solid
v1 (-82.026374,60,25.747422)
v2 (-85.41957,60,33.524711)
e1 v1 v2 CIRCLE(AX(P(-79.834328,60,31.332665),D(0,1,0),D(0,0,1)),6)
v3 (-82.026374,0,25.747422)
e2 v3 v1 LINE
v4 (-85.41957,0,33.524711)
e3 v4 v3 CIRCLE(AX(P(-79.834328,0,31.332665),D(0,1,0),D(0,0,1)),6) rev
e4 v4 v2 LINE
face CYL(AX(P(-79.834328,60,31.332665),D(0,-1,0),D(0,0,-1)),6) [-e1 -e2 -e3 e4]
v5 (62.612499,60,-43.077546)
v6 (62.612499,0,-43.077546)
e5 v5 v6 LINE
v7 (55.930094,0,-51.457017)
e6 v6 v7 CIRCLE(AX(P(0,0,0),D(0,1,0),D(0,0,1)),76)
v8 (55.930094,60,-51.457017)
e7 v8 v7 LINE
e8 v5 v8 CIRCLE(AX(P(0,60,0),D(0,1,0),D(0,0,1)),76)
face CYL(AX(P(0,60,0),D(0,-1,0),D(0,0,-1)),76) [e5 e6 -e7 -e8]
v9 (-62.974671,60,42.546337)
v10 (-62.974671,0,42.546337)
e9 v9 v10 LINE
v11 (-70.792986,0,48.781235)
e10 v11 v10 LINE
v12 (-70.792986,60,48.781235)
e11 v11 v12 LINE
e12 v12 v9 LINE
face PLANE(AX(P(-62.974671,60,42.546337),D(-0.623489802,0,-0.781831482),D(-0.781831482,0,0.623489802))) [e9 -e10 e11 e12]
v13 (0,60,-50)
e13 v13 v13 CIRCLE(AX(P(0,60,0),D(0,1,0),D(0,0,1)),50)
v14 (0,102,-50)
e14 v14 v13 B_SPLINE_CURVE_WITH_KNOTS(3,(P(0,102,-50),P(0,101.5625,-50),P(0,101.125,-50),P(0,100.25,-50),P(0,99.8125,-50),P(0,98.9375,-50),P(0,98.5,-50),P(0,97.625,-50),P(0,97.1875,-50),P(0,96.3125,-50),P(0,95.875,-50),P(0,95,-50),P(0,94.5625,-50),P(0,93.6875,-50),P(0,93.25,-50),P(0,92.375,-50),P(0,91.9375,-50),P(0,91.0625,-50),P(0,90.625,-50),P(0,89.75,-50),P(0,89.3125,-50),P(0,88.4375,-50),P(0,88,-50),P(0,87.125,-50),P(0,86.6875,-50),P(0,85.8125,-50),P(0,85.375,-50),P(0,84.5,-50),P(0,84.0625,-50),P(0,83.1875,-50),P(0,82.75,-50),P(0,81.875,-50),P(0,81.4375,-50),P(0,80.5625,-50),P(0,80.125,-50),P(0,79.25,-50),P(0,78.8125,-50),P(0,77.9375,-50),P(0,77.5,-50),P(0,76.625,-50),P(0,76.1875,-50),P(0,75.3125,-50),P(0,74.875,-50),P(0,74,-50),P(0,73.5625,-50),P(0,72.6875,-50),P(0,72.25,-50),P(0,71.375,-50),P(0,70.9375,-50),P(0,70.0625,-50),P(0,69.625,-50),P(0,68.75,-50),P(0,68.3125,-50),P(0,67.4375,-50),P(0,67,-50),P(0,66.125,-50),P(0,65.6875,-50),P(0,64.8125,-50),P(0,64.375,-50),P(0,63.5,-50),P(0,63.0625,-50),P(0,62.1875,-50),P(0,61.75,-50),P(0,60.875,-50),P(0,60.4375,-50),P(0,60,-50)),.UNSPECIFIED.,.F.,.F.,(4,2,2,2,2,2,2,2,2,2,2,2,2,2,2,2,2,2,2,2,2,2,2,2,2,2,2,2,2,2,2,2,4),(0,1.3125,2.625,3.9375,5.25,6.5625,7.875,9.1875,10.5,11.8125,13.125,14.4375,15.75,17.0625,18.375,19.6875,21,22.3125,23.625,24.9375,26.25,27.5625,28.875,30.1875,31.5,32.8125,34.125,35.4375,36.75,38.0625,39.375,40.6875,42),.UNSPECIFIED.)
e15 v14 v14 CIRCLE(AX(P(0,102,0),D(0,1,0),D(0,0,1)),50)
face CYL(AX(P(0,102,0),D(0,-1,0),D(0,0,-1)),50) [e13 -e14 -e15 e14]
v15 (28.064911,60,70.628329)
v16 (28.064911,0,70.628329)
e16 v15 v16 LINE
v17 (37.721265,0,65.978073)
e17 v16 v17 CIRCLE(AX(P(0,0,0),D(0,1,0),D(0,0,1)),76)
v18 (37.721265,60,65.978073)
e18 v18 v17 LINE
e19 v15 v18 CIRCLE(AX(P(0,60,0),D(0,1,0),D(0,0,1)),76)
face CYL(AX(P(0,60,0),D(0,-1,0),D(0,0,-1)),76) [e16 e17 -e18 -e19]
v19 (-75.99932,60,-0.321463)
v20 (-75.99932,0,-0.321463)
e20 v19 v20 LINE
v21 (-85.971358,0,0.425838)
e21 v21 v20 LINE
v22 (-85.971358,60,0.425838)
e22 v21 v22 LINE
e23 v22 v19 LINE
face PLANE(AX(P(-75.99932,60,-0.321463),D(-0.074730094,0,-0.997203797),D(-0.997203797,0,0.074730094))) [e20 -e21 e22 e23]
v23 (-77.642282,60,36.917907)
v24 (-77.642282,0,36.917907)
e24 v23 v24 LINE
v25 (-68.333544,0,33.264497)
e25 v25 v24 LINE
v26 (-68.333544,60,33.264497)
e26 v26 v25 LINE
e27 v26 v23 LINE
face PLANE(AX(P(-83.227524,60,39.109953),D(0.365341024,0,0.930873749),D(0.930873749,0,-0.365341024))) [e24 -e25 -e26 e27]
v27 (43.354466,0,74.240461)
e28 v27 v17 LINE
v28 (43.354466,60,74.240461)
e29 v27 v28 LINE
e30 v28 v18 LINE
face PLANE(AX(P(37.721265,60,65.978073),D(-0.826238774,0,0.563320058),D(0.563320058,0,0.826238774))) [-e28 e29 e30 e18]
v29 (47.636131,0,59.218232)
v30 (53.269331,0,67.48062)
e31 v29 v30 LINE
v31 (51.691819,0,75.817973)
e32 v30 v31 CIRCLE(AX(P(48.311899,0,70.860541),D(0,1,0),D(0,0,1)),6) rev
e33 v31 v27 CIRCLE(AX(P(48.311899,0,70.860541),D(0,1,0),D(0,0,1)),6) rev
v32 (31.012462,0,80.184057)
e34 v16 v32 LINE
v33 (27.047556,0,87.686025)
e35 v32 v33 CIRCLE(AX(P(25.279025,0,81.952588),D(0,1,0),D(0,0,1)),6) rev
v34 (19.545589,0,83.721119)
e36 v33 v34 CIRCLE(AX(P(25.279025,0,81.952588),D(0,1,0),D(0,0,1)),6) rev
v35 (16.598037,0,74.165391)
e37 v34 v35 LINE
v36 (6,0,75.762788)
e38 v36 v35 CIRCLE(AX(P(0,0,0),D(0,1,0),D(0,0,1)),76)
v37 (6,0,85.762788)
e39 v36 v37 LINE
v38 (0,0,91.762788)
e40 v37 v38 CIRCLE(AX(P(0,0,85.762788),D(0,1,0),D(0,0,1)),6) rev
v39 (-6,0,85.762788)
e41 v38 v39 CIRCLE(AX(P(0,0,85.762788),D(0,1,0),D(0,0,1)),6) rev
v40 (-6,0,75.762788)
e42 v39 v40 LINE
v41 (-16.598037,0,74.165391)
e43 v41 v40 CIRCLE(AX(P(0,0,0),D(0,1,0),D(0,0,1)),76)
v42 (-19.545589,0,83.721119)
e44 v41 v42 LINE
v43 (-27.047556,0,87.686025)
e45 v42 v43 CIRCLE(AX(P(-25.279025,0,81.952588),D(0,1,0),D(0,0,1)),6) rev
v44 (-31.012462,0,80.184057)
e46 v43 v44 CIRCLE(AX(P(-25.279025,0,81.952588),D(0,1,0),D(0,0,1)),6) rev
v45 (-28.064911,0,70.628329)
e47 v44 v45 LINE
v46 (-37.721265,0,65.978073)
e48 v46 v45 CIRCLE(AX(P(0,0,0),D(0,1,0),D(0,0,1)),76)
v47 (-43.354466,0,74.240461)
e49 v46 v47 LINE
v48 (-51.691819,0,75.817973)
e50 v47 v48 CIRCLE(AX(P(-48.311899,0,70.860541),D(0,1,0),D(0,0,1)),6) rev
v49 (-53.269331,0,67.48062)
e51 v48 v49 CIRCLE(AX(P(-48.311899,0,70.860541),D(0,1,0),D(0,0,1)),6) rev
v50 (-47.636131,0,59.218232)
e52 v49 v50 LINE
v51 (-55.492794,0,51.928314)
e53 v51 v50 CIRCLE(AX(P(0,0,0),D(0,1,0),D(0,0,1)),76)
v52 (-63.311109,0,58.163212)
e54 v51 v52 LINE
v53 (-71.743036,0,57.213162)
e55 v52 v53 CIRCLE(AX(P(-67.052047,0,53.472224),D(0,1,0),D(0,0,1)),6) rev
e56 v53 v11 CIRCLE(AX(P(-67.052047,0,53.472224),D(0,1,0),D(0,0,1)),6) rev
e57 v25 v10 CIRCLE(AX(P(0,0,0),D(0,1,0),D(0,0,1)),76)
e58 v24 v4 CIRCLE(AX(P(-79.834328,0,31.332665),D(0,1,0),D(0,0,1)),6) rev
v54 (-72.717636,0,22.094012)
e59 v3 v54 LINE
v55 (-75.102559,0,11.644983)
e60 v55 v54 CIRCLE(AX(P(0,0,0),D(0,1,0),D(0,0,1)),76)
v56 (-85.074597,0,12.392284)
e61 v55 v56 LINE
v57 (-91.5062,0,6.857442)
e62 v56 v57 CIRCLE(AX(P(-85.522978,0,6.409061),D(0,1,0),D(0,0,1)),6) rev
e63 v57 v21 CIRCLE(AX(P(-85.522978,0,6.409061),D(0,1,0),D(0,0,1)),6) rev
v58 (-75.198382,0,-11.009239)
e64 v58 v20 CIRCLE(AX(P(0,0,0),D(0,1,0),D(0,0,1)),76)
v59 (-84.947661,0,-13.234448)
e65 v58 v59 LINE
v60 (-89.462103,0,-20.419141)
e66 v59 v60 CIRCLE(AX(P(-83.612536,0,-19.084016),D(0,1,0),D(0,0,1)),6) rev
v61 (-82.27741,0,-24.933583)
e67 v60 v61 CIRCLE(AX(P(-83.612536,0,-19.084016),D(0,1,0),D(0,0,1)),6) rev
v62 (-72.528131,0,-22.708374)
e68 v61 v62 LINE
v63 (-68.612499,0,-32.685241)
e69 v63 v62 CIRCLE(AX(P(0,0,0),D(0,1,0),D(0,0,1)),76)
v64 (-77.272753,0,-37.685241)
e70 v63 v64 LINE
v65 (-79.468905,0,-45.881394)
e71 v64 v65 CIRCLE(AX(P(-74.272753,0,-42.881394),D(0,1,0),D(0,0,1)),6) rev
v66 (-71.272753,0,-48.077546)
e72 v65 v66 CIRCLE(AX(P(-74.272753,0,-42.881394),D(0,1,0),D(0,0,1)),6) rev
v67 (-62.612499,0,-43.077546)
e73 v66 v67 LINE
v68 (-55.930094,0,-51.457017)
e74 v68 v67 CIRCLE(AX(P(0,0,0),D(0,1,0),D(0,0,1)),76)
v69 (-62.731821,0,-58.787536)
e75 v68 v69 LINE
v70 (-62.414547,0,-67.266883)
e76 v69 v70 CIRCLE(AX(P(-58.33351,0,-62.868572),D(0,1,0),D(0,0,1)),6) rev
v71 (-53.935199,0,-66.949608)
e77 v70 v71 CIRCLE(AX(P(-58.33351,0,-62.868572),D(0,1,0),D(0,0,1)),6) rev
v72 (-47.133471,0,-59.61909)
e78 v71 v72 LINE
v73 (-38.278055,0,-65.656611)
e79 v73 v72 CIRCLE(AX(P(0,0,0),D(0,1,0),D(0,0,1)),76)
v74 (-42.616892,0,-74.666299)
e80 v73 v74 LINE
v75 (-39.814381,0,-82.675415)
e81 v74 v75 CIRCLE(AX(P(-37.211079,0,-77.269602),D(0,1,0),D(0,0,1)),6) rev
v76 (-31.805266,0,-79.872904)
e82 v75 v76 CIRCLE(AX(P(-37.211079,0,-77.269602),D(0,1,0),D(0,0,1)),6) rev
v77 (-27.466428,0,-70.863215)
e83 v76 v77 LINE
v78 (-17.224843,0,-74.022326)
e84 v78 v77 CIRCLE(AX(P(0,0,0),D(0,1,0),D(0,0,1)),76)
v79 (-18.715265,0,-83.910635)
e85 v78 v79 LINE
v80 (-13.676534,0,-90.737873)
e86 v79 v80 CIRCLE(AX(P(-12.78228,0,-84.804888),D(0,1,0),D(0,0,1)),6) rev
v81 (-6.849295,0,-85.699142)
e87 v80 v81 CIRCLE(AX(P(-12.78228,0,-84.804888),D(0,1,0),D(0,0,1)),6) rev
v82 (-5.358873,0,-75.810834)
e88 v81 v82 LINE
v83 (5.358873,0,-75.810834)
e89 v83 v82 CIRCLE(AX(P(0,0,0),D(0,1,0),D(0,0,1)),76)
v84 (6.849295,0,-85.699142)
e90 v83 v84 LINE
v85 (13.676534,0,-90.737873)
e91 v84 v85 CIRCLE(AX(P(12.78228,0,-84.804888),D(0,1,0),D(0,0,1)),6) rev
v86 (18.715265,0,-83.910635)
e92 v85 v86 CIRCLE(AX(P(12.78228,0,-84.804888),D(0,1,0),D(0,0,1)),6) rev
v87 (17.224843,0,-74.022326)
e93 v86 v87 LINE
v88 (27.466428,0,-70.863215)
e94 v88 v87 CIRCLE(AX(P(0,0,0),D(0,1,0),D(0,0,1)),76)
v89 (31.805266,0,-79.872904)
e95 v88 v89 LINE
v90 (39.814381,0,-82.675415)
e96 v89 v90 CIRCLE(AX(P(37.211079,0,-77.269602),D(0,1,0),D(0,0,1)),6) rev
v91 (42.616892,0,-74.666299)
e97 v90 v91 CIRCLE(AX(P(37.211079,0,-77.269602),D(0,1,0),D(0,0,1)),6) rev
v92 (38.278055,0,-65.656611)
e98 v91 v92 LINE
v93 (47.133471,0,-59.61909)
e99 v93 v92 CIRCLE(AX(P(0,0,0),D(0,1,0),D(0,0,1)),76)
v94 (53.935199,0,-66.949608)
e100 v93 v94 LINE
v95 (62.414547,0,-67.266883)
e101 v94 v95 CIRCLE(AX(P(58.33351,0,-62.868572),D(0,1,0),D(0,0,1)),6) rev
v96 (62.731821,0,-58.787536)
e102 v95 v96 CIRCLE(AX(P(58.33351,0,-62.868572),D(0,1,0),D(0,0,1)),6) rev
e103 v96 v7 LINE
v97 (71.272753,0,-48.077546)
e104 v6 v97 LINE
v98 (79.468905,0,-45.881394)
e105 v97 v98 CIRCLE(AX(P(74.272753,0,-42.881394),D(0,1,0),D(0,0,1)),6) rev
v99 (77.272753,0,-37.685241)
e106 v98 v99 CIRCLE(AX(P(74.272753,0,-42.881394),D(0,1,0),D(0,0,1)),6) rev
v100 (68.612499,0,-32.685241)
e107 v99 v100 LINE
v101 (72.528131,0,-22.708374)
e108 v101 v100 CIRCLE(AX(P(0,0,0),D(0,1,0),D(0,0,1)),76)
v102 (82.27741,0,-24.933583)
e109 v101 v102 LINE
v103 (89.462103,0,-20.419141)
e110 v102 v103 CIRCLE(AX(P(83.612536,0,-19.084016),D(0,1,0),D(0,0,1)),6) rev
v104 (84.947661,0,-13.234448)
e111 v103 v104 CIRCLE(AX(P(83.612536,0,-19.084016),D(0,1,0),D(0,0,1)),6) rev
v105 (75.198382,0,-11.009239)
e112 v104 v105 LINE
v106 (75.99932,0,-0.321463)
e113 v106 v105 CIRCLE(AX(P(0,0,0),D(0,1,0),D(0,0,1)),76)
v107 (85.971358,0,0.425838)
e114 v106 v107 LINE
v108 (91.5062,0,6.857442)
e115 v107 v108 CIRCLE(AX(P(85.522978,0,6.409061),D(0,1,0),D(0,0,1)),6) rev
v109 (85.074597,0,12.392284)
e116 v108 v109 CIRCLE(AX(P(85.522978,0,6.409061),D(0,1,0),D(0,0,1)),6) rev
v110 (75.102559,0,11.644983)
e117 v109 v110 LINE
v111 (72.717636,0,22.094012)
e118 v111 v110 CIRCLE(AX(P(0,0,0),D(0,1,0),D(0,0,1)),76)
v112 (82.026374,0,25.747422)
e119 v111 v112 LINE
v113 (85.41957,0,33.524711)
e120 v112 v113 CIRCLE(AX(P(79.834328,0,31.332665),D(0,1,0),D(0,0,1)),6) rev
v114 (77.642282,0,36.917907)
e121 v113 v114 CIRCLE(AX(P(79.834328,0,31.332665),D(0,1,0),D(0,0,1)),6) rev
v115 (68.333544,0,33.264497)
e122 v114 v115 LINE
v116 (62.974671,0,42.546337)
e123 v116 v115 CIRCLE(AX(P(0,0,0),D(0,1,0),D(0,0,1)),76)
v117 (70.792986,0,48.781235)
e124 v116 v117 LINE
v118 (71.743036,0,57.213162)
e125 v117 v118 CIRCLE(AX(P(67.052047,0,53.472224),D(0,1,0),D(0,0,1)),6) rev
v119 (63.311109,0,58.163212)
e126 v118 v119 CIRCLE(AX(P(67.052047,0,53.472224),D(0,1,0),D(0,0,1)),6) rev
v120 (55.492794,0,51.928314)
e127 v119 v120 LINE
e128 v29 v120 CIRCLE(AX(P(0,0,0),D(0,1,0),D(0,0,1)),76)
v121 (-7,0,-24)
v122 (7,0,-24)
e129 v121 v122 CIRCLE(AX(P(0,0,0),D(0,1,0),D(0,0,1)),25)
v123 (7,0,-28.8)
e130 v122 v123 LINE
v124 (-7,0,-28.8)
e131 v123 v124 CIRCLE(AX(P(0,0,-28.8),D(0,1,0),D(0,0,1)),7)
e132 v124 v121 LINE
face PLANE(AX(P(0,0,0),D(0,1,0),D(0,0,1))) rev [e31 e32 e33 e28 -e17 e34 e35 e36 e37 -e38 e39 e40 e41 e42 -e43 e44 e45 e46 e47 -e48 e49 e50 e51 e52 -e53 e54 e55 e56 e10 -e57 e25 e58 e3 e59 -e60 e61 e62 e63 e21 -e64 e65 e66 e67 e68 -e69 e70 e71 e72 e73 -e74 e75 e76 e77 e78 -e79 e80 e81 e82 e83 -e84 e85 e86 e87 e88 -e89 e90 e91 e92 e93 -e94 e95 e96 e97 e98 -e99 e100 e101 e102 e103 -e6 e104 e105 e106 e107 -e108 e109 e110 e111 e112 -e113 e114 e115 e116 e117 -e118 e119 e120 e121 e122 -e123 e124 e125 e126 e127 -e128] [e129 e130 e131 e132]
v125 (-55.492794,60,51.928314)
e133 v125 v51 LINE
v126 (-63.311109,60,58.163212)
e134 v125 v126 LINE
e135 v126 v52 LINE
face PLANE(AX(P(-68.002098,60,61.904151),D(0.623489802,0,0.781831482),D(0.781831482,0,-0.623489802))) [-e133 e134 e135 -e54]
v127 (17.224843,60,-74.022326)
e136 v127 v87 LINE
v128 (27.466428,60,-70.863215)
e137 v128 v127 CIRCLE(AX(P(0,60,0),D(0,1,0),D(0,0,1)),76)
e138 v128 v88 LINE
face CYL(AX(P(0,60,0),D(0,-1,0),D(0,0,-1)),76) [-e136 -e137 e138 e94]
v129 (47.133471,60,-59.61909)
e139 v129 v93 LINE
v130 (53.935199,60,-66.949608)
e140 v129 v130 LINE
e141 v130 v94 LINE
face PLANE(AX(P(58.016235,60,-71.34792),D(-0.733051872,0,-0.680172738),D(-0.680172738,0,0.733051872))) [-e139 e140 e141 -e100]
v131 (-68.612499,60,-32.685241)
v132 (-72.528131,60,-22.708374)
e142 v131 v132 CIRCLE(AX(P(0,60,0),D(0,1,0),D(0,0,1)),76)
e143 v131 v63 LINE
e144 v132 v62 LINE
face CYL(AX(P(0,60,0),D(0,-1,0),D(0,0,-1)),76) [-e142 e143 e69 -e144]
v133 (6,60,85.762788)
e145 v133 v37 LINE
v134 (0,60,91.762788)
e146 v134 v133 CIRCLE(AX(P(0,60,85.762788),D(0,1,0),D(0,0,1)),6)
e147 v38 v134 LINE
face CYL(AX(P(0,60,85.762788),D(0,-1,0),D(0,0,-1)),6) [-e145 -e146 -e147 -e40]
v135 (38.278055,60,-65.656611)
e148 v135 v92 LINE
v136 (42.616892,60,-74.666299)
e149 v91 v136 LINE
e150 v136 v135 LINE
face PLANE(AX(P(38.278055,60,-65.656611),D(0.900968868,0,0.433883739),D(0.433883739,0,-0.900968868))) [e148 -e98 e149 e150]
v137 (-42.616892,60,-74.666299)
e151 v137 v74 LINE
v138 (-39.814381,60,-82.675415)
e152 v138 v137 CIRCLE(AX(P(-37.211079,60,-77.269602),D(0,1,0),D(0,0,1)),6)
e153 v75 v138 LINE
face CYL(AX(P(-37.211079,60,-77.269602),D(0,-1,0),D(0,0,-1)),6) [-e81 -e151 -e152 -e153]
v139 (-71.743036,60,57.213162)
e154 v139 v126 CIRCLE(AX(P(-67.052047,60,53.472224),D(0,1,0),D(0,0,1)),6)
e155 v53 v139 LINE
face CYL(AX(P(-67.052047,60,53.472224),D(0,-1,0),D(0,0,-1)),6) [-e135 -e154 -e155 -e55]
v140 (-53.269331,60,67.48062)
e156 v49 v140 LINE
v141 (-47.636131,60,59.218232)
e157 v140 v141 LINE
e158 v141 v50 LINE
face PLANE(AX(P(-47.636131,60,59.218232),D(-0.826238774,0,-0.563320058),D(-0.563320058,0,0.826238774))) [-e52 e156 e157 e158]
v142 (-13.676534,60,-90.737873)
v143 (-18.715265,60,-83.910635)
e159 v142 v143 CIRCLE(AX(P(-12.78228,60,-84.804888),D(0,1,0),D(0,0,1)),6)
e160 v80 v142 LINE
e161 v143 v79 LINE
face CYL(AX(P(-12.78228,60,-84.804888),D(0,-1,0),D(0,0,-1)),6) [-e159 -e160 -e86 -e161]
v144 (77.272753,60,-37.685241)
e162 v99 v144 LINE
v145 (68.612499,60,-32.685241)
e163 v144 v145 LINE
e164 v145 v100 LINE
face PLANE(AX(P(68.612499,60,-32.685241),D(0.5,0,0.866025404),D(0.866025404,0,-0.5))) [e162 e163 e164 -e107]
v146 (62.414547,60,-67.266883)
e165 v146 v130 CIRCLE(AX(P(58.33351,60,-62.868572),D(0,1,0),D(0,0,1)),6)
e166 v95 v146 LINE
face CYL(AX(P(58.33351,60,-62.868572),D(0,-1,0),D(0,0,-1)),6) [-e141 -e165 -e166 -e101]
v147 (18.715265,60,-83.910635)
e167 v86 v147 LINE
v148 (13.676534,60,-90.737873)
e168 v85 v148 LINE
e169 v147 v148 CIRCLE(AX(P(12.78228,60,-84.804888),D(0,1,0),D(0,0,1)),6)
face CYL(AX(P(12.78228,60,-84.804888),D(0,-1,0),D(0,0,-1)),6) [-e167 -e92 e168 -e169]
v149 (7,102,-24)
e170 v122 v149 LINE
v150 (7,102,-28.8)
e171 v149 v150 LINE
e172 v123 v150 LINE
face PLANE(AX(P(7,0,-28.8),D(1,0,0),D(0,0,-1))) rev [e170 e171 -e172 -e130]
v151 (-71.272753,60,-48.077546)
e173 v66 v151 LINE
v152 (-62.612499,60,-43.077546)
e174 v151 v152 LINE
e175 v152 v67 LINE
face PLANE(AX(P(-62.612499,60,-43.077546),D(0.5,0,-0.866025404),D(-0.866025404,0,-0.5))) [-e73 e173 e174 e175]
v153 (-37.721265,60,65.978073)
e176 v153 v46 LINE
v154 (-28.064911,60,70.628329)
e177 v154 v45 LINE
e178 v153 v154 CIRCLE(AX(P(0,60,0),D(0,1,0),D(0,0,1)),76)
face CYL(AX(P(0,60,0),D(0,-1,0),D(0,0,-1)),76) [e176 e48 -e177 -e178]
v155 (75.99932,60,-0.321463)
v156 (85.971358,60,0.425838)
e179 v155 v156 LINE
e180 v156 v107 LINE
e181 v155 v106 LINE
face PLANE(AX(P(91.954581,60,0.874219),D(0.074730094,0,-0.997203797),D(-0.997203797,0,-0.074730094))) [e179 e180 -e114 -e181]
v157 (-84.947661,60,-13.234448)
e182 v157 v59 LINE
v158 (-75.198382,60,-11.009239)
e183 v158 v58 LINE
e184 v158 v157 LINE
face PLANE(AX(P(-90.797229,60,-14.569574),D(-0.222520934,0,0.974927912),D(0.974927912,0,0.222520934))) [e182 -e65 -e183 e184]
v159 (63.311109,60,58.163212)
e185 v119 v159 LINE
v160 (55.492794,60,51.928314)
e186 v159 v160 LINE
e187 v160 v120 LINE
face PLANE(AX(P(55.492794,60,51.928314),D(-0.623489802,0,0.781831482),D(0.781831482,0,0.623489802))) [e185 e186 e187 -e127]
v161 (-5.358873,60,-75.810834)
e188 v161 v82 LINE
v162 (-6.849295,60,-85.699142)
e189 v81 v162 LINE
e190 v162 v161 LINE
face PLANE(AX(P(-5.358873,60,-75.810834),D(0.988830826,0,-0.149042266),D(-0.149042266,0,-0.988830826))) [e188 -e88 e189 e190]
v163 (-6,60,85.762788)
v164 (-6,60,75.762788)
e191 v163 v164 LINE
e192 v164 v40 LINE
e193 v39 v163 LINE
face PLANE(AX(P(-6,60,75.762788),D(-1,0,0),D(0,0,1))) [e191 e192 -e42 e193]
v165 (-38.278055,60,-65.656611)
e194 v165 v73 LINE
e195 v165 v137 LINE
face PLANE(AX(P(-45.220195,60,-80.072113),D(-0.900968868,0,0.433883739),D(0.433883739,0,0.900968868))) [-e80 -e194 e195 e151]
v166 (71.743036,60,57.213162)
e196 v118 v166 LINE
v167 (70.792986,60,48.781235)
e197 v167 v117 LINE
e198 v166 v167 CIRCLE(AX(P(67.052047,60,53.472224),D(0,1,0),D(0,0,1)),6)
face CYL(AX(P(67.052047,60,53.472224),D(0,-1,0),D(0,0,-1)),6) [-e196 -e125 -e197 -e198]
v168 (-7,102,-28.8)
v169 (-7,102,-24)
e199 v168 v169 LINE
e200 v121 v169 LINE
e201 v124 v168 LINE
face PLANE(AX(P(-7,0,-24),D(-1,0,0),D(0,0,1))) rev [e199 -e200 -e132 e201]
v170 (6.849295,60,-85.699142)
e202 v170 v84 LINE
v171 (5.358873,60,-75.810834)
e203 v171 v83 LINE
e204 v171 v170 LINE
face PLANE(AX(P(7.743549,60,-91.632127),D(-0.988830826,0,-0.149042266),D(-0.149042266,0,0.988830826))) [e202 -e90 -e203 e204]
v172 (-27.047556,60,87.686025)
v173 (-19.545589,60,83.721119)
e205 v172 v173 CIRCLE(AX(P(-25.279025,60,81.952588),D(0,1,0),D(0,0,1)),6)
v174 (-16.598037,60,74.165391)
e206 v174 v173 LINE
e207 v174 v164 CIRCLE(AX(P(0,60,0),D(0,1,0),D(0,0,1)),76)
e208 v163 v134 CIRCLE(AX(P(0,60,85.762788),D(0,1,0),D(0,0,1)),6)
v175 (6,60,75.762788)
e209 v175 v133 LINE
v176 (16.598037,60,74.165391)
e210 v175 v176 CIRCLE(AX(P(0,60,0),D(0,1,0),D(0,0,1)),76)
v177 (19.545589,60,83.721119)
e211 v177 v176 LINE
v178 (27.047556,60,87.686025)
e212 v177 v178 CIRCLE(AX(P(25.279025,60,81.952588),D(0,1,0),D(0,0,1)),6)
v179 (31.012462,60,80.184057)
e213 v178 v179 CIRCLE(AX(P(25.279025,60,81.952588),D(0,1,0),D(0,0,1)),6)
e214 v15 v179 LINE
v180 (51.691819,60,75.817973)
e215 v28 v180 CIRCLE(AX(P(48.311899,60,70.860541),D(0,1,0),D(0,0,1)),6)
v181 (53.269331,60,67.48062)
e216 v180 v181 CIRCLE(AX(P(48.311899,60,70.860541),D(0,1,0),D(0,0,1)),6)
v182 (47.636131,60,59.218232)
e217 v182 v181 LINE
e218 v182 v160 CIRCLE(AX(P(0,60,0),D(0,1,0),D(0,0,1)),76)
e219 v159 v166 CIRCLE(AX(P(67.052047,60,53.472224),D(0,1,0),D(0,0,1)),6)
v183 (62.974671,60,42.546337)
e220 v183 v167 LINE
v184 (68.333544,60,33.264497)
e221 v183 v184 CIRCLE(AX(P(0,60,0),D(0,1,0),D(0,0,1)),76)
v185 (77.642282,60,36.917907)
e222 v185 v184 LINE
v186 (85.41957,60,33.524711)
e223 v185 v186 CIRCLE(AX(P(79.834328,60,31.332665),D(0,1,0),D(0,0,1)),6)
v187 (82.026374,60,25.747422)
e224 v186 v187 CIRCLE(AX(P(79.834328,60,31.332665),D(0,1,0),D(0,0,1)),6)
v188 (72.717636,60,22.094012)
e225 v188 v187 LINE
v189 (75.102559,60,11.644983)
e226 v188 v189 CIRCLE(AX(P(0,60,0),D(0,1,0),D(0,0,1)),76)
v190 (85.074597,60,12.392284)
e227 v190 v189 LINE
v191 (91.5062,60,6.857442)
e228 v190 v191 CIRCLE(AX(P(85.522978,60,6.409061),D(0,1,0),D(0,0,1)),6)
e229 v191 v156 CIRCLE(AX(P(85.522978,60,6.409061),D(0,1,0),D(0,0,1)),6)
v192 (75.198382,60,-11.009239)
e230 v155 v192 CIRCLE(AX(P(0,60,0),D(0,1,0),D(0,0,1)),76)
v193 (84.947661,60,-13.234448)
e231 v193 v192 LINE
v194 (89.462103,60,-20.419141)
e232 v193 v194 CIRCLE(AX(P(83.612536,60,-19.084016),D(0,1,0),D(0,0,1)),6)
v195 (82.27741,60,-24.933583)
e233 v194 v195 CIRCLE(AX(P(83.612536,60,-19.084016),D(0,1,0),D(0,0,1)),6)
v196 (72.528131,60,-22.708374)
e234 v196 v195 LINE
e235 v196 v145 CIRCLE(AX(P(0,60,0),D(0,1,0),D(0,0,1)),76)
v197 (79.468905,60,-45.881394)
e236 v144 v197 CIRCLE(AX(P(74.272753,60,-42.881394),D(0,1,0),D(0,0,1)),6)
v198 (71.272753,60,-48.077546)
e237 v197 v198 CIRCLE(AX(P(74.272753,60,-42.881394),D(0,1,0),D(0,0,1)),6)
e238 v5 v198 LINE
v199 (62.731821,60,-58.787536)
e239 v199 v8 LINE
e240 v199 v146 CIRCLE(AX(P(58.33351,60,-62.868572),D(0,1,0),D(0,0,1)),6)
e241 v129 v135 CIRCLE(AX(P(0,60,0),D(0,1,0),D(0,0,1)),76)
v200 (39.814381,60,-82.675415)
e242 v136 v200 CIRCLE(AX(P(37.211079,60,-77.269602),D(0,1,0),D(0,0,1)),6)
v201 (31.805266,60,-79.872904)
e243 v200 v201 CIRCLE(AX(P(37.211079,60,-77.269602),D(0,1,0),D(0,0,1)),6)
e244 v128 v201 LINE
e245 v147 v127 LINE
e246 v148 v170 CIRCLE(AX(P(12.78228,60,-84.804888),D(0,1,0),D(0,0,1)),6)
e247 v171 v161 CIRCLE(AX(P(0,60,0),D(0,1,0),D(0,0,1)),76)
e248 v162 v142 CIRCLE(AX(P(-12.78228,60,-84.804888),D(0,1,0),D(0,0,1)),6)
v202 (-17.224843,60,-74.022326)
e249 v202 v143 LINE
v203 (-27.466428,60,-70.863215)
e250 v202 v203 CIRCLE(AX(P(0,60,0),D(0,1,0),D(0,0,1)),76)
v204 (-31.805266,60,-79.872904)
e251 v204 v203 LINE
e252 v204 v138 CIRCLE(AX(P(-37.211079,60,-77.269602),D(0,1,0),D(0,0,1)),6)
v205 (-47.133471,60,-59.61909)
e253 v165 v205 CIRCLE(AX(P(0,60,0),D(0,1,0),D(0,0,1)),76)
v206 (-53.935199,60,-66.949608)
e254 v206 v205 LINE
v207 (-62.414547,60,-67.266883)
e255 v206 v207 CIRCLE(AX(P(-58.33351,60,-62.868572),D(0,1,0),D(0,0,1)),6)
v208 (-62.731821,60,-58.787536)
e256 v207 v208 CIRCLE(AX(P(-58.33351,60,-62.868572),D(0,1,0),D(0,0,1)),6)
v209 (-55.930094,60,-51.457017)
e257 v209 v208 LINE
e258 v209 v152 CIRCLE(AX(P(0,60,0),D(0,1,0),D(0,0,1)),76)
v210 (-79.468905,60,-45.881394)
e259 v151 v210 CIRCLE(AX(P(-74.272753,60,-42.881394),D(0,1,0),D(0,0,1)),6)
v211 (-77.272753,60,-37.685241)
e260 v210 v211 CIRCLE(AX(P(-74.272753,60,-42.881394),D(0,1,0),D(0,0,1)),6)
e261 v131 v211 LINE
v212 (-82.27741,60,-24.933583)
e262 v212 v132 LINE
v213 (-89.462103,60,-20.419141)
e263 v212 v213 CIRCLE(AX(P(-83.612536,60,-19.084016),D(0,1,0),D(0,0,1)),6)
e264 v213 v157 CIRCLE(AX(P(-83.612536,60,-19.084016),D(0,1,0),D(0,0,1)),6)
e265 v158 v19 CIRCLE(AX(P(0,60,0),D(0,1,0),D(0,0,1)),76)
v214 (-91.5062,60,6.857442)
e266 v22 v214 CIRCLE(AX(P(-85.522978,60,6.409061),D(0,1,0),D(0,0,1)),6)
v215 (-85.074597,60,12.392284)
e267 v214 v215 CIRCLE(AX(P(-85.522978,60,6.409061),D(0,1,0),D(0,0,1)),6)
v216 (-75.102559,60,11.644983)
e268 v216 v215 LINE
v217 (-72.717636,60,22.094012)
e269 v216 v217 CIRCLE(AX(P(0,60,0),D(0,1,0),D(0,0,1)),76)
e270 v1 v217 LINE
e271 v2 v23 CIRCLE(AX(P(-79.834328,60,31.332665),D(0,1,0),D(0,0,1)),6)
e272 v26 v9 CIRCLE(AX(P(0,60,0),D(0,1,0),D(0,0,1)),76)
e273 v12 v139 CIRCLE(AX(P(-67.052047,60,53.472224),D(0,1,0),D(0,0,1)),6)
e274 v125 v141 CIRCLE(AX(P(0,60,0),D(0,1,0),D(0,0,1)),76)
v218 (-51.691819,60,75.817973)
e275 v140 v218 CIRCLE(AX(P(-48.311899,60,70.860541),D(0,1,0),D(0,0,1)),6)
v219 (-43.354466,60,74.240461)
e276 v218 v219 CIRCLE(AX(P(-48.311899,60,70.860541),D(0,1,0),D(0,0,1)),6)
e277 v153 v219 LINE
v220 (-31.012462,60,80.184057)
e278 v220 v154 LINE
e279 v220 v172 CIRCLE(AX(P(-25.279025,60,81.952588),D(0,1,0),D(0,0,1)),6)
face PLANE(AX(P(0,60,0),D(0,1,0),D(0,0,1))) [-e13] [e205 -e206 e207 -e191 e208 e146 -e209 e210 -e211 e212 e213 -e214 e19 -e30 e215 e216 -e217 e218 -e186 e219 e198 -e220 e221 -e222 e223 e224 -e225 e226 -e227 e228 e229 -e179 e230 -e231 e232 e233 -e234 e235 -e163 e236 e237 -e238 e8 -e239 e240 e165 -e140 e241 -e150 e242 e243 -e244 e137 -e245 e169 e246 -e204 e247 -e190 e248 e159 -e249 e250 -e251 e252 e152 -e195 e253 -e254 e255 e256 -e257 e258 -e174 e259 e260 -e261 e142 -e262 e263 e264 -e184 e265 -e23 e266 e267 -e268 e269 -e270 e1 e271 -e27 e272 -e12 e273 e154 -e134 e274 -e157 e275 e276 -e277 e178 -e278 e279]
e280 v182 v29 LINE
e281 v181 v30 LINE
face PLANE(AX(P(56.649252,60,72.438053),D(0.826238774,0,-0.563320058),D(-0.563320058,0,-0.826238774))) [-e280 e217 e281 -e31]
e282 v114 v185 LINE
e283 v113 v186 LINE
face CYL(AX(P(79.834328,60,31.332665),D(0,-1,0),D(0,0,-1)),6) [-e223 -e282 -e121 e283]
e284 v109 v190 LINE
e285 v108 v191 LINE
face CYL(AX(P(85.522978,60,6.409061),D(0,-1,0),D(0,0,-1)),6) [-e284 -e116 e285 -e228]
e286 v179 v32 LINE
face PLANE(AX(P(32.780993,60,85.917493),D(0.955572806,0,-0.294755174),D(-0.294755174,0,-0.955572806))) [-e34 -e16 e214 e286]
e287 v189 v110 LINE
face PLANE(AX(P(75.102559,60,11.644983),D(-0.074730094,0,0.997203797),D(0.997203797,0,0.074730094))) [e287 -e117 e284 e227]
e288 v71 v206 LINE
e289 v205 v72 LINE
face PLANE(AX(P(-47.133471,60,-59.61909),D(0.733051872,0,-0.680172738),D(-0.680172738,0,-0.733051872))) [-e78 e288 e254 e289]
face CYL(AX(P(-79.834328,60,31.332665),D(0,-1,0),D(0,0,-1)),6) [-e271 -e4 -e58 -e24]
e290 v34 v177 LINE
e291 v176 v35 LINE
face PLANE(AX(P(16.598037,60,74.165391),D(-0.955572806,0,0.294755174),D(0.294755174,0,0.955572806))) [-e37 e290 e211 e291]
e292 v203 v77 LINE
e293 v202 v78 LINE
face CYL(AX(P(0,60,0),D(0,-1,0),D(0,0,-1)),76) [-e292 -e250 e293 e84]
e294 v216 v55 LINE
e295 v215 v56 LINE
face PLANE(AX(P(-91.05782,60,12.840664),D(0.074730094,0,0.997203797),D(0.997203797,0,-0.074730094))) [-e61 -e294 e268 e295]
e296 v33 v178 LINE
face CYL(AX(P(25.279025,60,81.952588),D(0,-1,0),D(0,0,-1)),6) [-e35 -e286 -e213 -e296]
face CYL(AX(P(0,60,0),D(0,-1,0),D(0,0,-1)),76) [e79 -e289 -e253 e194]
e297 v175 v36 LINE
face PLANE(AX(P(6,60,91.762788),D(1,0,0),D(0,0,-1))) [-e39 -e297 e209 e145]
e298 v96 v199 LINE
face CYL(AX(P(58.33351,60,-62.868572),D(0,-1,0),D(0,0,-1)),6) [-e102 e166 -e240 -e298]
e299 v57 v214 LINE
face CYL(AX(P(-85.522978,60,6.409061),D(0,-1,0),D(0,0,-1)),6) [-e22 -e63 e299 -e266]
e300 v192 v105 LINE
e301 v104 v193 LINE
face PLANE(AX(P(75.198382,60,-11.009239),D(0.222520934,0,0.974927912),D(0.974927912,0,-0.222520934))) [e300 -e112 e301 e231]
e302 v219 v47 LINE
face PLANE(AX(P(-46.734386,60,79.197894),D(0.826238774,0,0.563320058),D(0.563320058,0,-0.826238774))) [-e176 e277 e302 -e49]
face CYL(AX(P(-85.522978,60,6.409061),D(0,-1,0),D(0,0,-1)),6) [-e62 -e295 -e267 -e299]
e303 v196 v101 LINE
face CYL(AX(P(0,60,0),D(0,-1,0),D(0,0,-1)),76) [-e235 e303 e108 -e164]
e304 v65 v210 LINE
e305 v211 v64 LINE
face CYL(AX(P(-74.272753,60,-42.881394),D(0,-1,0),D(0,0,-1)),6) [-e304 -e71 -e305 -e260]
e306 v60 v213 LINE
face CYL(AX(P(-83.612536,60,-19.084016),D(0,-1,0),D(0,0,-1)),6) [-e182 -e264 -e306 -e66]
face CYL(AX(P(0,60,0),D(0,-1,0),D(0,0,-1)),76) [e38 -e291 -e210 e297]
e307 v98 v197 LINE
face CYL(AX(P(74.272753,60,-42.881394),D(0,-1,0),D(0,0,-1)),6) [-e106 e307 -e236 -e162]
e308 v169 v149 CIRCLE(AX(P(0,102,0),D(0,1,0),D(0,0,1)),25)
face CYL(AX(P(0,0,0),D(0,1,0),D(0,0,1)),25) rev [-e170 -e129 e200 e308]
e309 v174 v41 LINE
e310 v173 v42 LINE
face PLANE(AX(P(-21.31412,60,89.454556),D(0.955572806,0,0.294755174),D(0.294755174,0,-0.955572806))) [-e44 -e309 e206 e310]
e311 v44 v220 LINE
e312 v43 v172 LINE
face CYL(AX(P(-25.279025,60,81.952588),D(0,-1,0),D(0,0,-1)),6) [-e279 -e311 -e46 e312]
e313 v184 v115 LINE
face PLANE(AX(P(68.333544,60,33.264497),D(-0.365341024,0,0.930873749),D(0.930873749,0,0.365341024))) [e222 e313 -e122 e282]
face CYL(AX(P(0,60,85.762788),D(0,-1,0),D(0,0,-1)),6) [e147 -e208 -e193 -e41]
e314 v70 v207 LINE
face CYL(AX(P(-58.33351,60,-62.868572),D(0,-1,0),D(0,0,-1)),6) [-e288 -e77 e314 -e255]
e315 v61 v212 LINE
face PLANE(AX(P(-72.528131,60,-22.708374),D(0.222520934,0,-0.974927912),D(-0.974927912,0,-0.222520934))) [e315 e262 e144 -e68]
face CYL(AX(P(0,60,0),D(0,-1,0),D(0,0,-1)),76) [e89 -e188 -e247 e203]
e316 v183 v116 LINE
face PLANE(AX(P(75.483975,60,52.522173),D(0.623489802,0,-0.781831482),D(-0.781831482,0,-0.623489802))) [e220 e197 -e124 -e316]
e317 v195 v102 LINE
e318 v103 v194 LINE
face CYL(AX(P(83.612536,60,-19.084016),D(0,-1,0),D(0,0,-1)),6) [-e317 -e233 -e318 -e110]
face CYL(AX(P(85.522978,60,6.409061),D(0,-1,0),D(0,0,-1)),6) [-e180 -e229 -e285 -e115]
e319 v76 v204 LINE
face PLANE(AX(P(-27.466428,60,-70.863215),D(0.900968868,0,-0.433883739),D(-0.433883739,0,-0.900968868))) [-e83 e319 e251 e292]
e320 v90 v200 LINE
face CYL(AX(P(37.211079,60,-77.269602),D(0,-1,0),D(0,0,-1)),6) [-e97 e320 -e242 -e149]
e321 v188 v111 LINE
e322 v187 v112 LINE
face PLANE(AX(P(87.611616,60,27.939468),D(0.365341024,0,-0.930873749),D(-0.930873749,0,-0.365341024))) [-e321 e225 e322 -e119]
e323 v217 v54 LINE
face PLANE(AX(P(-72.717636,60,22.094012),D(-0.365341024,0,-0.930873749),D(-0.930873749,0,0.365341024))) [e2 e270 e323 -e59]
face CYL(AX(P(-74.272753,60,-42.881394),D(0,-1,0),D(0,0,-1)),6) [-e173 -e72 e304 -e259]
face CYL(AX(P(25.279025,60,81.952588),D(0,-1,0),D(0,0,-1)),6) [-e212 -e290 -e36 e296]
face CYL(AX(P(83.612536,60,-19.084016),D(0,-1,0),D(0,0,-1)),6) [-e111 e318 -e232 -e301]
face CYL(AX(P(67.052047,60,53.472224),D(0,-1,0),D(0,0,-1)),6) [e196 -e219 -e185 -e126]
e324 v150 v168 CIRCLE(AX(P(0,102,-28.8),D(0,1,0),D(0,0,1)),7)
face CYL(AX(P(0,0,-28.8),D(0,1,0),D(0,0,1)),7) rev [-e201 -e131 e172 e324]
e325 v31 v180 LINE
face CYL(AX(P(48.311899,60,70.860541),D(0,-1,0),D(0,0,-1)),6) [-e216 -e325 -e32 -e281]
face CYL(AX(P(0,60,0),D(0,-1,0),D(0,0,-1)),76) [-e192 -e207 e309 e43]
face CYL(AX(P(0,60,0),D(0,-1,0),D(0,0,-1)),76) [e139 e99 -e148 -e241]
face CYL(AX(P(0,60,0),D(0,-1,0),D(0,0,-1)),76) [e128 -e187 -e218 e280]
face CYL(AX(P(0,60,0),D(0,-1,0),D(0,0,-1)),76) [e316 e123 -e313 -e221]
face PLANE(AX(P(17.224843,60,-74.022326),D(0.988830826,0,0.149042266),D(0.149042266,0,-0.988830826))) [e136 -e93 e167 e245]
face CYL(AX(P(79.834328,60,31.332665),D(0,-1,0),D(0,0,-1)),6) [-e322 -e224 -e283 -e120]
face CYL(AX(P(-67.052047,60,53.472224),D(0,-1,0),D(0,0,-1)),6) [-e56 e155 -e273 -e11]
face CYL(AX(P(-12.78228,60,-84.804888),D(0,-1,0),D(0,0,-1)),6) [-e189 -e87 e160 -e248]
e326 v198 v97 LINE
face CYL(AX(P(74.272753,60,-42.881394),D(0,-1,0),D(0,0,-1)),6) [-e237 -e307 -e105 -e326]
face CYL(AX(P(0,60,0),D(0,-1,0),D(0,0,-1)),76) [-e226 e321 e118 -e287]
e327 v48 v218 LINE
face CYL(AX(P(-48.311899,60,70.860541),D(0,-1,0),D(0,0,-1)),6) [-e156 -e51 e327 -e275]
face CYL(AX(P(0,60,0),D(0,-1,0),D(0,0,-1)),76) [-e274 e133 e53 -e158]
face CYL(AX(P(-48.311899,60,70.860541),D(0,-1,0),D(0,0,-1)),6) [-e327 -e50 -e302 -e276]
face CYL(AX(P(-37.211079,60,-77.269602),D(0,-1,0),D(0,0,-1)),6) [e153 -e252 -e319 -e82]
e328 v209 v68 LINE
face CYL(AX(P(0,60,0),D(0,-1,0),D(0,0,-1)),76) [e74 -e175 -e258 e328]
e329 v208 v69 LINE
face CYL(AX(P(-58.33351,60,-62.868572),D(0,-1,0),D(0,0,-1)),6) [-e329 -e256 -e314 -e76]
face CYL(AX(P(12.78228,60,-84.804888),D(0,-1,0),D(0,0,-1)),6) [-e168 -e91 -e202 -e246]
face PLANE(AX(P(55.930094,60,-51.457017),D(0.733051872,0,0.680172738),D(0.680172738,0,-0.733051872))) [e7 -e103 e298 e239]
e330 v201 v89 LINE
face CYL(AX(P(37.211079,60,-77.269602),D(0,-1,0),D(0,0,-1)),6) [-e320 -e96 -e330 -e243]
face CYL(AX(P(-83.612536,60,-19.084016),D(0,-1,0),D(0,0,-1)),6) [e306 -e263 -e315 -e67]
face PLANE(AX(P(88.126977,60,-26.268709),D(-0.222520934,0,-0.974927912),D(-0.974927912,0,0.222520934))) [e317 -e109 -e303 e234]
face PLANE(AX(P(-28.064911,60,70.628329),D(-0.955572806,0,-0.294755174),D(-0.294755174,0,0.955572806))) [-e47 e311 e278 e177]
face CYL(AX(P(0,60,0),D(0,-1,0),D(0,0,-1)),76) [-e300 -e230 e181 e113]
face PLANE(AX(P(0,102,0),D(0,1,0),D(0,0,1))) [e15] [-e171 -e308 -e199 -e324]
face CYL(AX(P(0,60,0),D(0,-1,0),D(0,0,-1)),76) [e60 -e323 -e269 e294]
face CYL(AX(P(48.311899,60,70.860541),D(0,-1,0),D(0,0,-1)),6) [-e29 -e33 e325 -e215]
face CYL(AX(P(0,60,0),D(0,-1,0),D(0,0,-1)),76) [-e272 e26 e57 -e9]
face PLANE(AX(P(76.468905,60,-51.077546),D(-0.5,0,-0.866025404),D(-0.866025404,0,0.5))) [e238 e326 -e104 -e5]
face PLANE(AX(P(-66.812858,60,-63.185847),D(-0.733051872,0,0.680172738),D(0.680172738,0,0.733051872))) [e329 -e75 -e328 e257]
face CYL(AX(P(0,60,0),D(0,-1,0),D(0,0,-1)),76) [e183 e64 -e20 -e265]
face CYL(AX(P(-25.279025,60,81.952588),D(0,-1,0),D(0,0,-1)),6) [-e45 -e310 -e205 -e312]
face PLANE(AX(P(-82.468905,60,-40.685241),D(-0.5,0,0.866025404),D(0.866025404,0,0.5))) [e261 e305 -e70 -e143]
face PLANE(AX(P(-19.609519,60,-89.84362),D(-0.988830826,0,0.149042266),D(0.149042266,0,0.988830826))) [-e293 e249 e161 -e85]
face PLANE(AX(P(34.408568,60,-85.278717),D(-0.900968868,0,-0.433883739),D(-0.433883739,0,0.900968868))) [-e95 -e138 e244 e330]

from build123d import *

# Parameters (mm, degrees)
SKETCH_1_R                       = 76
EXTRUDE_1_DEPTH                  = 60
SKETCH_2_R                       = 50
EXTRUDE_2_DEPTH                  = 42
CUT_EXTRUDE_1_DEPTH              = 149.175571536
SKETCH_4_R                       = 7
CUT_EXTRUDE_2_DEPTH              = 149.175571536
EXTRUDE_3_DEPTH                  = 60
FILLET_1_R                       = 6
PATTERN_CIRCULAR_1_COUNT         = 21
FILLET_1_OF_PATTERN_CIRCULAR_1_R = 6


with BuildPart() as part:
    # 草图1 → 凸台-拉伸1 (new body)
    with BuildSketch(Plane(origin=(0, 0, 0), x_dir=(1, 0, 0), z_dir=(0, 1, 0))):
        with Locations(Location((0, 0, 0), (0, 0, 270))):
            Circle(SKETCH_1_R)
    extrude(amount=EXTRUDE_1_DEPTH)

    # 草图2 → 凸台-拉伸2 (add)
    with BuildSketch(Plane(origin=(0, 60, 0), x_dir=(1, 0, 0), z_dir=(0, 1, 0))):
        with Locations(Location((0, 0, 0), (0, 0, 90))):
            Circle(SKETCH_2_R)
    extrude(amount=EXTRUDE_2_DEPTH)

    # 草图3 → 切除-拉伸1 (cut, through all)
    with BuildSketch(Plane(origin=(0, 102, 0), x_dir=(1, 0, 0), z_dir=(0, 1, 0))):
        with BuildLine():
            Line((-7, 24), (-7, 28.8))
            Line((-7, 28.8), (7, 28.8))
            Line((7, 28.8), (7, 24))
            ThreePointArc((7, 24), (0, -25), (-7, 24))
        make_face()
    extrude(amount=-CUT_EXTRUDE_1_DEPTH, mode=Mode.SUBTRACT)

    # 草图4 → 切除-拉伸2 (cut, through all)
    with BuildSketch(Plane(origin=(0, 102, 0), x_dir=(1, 0, 0), z_dir=(0, 1, 0))):
        with Locations((0, 28.8)):
            Circle(SKETCH_4_R)
    extrude(amount=-CUT_EXTRUDE_2_DEPTH, mode=Mode.SUBTRACT)

    # 草图5 → 凸台-拉伸3 (add)
    with BuildSketch(Plane(origin=(0, 0, 0), x_dir=(-1, 0, 0), z_dir=(0, -1, 0))):
        with BuildLine():
            Line((6, -75.7627877), (6, -91.7627877))
            Line((6, -91.7627877), (-6, -91.7627877))
            Line((-6, -91.7627877), (-6, -75.7627877))
            ThreePointArc((-6, -75.7627877), (0, -76), (6, -75.7627877))
        make_face()
    extrude_3 = extrude(amount=-EXTRUDE_3_DEPTH)

    # 圆角1
    fillet_1_edges = [part.edges().sort_by_distance(p)[0] for p in [
        (-6, 30, 91.7627877),
        (6, 30, 91.7627877),
    ]]
    fillet(fillet_1_edges, radius=FILLET_1_R - 0.0001)  # a hair under: the kernel refuses the full size

    # 阵列(圆周)1: 凸台-拉伸3 ×21 about axis
    pattern_circular_1_axis = Axis((0, 0, 0), (0, 1, 0))
    for i in range(1, PATTERN_CIRCULAR_1_COUNT):
        add(extrude_3.rotate(pattern_circular_1_axis, i * 360 / PATTERN_CIRCULAR_1_COUNT))

    # 圆角1 of 阵列(圆周)1
    fillet_1_of_pattern_circular_1_edges = [part.edges().sort_by_distance(p)[0] for p in [
        (21.314119658, 30, 89.454555555),
        (32.780993328, 30, 85.917493462),
        (46.734386249, 30, 79.197893585),
        (56.649251541, 30, 72.438052888),
        (68.002097531, 30, 61.904151216),
        (75.483975154, 30, 52.522173426),
        (83.227524026, 30, 39.109953349),
        (87.611616318, 30, 27.939468365),
        (91.057819772, 30, 12.840664496),
        (91.954580895, 30, 0.874218929),
        (90.797228632, 30, -14.569573748),
        (88.126977424, 30, -26.268708694),
        (82.46890527, 30, -40.685241427),
        (76.46890527, 30, -51.077546272),
        (66.812857766, 30, -63.185846861),
        (58.016235304, 30, -71.347919714),
        (45.220194646, 30, -80.072112514),
        (34.408568231, 30, -85.278717384),
        (19.609518787, 30, -89.843619581),
        (7.743548872, 30, -91.632126775),
        (-7.743548872, 30, -91.632126775),
        (-19.609518787, 30, -89.843619581),
        (-34.408568231, 30, -85.278717384),
        (-45.220194646, 30, -80.072112514),
        (-58.016235304, 30, -71.347919714),
        (-66.812857766, 30, -63.185846861),
        (-76.46890527, 30, -51.077546272),
        (-82.46890527, 30, -40.685241427),
        (-88.126977424, 30, -26.268708694),
        (-90.797228632, 30, -14.569573748),
        (-91.954580895, 30, 0.874218929),
        (-91.057819772, 30, 12.840664496),
        (-87.611616318, 30, 27.939468365),
        (-83.227524026, 30, 39.109953349),
        (-75.483975154, 30, 52.522173426),
        (-68.002097531, 30, 61.904151216),
        (-56.649251541, 30, 72.438052888),
        (-46.734386249, 30, 79.197893585),
        (-32.780993328, 30, 85.917493462),
        (-21.314119658, 30, 89.454555555),
    ]]
    fillet(fillet_1_of_pattern_circular_1_edges, radius=FILLET_1_OF_PATTERN_CIRCULAR_1_R - 0.0001)  # a hair under: the kernel refuses the full size


solid = part.part
